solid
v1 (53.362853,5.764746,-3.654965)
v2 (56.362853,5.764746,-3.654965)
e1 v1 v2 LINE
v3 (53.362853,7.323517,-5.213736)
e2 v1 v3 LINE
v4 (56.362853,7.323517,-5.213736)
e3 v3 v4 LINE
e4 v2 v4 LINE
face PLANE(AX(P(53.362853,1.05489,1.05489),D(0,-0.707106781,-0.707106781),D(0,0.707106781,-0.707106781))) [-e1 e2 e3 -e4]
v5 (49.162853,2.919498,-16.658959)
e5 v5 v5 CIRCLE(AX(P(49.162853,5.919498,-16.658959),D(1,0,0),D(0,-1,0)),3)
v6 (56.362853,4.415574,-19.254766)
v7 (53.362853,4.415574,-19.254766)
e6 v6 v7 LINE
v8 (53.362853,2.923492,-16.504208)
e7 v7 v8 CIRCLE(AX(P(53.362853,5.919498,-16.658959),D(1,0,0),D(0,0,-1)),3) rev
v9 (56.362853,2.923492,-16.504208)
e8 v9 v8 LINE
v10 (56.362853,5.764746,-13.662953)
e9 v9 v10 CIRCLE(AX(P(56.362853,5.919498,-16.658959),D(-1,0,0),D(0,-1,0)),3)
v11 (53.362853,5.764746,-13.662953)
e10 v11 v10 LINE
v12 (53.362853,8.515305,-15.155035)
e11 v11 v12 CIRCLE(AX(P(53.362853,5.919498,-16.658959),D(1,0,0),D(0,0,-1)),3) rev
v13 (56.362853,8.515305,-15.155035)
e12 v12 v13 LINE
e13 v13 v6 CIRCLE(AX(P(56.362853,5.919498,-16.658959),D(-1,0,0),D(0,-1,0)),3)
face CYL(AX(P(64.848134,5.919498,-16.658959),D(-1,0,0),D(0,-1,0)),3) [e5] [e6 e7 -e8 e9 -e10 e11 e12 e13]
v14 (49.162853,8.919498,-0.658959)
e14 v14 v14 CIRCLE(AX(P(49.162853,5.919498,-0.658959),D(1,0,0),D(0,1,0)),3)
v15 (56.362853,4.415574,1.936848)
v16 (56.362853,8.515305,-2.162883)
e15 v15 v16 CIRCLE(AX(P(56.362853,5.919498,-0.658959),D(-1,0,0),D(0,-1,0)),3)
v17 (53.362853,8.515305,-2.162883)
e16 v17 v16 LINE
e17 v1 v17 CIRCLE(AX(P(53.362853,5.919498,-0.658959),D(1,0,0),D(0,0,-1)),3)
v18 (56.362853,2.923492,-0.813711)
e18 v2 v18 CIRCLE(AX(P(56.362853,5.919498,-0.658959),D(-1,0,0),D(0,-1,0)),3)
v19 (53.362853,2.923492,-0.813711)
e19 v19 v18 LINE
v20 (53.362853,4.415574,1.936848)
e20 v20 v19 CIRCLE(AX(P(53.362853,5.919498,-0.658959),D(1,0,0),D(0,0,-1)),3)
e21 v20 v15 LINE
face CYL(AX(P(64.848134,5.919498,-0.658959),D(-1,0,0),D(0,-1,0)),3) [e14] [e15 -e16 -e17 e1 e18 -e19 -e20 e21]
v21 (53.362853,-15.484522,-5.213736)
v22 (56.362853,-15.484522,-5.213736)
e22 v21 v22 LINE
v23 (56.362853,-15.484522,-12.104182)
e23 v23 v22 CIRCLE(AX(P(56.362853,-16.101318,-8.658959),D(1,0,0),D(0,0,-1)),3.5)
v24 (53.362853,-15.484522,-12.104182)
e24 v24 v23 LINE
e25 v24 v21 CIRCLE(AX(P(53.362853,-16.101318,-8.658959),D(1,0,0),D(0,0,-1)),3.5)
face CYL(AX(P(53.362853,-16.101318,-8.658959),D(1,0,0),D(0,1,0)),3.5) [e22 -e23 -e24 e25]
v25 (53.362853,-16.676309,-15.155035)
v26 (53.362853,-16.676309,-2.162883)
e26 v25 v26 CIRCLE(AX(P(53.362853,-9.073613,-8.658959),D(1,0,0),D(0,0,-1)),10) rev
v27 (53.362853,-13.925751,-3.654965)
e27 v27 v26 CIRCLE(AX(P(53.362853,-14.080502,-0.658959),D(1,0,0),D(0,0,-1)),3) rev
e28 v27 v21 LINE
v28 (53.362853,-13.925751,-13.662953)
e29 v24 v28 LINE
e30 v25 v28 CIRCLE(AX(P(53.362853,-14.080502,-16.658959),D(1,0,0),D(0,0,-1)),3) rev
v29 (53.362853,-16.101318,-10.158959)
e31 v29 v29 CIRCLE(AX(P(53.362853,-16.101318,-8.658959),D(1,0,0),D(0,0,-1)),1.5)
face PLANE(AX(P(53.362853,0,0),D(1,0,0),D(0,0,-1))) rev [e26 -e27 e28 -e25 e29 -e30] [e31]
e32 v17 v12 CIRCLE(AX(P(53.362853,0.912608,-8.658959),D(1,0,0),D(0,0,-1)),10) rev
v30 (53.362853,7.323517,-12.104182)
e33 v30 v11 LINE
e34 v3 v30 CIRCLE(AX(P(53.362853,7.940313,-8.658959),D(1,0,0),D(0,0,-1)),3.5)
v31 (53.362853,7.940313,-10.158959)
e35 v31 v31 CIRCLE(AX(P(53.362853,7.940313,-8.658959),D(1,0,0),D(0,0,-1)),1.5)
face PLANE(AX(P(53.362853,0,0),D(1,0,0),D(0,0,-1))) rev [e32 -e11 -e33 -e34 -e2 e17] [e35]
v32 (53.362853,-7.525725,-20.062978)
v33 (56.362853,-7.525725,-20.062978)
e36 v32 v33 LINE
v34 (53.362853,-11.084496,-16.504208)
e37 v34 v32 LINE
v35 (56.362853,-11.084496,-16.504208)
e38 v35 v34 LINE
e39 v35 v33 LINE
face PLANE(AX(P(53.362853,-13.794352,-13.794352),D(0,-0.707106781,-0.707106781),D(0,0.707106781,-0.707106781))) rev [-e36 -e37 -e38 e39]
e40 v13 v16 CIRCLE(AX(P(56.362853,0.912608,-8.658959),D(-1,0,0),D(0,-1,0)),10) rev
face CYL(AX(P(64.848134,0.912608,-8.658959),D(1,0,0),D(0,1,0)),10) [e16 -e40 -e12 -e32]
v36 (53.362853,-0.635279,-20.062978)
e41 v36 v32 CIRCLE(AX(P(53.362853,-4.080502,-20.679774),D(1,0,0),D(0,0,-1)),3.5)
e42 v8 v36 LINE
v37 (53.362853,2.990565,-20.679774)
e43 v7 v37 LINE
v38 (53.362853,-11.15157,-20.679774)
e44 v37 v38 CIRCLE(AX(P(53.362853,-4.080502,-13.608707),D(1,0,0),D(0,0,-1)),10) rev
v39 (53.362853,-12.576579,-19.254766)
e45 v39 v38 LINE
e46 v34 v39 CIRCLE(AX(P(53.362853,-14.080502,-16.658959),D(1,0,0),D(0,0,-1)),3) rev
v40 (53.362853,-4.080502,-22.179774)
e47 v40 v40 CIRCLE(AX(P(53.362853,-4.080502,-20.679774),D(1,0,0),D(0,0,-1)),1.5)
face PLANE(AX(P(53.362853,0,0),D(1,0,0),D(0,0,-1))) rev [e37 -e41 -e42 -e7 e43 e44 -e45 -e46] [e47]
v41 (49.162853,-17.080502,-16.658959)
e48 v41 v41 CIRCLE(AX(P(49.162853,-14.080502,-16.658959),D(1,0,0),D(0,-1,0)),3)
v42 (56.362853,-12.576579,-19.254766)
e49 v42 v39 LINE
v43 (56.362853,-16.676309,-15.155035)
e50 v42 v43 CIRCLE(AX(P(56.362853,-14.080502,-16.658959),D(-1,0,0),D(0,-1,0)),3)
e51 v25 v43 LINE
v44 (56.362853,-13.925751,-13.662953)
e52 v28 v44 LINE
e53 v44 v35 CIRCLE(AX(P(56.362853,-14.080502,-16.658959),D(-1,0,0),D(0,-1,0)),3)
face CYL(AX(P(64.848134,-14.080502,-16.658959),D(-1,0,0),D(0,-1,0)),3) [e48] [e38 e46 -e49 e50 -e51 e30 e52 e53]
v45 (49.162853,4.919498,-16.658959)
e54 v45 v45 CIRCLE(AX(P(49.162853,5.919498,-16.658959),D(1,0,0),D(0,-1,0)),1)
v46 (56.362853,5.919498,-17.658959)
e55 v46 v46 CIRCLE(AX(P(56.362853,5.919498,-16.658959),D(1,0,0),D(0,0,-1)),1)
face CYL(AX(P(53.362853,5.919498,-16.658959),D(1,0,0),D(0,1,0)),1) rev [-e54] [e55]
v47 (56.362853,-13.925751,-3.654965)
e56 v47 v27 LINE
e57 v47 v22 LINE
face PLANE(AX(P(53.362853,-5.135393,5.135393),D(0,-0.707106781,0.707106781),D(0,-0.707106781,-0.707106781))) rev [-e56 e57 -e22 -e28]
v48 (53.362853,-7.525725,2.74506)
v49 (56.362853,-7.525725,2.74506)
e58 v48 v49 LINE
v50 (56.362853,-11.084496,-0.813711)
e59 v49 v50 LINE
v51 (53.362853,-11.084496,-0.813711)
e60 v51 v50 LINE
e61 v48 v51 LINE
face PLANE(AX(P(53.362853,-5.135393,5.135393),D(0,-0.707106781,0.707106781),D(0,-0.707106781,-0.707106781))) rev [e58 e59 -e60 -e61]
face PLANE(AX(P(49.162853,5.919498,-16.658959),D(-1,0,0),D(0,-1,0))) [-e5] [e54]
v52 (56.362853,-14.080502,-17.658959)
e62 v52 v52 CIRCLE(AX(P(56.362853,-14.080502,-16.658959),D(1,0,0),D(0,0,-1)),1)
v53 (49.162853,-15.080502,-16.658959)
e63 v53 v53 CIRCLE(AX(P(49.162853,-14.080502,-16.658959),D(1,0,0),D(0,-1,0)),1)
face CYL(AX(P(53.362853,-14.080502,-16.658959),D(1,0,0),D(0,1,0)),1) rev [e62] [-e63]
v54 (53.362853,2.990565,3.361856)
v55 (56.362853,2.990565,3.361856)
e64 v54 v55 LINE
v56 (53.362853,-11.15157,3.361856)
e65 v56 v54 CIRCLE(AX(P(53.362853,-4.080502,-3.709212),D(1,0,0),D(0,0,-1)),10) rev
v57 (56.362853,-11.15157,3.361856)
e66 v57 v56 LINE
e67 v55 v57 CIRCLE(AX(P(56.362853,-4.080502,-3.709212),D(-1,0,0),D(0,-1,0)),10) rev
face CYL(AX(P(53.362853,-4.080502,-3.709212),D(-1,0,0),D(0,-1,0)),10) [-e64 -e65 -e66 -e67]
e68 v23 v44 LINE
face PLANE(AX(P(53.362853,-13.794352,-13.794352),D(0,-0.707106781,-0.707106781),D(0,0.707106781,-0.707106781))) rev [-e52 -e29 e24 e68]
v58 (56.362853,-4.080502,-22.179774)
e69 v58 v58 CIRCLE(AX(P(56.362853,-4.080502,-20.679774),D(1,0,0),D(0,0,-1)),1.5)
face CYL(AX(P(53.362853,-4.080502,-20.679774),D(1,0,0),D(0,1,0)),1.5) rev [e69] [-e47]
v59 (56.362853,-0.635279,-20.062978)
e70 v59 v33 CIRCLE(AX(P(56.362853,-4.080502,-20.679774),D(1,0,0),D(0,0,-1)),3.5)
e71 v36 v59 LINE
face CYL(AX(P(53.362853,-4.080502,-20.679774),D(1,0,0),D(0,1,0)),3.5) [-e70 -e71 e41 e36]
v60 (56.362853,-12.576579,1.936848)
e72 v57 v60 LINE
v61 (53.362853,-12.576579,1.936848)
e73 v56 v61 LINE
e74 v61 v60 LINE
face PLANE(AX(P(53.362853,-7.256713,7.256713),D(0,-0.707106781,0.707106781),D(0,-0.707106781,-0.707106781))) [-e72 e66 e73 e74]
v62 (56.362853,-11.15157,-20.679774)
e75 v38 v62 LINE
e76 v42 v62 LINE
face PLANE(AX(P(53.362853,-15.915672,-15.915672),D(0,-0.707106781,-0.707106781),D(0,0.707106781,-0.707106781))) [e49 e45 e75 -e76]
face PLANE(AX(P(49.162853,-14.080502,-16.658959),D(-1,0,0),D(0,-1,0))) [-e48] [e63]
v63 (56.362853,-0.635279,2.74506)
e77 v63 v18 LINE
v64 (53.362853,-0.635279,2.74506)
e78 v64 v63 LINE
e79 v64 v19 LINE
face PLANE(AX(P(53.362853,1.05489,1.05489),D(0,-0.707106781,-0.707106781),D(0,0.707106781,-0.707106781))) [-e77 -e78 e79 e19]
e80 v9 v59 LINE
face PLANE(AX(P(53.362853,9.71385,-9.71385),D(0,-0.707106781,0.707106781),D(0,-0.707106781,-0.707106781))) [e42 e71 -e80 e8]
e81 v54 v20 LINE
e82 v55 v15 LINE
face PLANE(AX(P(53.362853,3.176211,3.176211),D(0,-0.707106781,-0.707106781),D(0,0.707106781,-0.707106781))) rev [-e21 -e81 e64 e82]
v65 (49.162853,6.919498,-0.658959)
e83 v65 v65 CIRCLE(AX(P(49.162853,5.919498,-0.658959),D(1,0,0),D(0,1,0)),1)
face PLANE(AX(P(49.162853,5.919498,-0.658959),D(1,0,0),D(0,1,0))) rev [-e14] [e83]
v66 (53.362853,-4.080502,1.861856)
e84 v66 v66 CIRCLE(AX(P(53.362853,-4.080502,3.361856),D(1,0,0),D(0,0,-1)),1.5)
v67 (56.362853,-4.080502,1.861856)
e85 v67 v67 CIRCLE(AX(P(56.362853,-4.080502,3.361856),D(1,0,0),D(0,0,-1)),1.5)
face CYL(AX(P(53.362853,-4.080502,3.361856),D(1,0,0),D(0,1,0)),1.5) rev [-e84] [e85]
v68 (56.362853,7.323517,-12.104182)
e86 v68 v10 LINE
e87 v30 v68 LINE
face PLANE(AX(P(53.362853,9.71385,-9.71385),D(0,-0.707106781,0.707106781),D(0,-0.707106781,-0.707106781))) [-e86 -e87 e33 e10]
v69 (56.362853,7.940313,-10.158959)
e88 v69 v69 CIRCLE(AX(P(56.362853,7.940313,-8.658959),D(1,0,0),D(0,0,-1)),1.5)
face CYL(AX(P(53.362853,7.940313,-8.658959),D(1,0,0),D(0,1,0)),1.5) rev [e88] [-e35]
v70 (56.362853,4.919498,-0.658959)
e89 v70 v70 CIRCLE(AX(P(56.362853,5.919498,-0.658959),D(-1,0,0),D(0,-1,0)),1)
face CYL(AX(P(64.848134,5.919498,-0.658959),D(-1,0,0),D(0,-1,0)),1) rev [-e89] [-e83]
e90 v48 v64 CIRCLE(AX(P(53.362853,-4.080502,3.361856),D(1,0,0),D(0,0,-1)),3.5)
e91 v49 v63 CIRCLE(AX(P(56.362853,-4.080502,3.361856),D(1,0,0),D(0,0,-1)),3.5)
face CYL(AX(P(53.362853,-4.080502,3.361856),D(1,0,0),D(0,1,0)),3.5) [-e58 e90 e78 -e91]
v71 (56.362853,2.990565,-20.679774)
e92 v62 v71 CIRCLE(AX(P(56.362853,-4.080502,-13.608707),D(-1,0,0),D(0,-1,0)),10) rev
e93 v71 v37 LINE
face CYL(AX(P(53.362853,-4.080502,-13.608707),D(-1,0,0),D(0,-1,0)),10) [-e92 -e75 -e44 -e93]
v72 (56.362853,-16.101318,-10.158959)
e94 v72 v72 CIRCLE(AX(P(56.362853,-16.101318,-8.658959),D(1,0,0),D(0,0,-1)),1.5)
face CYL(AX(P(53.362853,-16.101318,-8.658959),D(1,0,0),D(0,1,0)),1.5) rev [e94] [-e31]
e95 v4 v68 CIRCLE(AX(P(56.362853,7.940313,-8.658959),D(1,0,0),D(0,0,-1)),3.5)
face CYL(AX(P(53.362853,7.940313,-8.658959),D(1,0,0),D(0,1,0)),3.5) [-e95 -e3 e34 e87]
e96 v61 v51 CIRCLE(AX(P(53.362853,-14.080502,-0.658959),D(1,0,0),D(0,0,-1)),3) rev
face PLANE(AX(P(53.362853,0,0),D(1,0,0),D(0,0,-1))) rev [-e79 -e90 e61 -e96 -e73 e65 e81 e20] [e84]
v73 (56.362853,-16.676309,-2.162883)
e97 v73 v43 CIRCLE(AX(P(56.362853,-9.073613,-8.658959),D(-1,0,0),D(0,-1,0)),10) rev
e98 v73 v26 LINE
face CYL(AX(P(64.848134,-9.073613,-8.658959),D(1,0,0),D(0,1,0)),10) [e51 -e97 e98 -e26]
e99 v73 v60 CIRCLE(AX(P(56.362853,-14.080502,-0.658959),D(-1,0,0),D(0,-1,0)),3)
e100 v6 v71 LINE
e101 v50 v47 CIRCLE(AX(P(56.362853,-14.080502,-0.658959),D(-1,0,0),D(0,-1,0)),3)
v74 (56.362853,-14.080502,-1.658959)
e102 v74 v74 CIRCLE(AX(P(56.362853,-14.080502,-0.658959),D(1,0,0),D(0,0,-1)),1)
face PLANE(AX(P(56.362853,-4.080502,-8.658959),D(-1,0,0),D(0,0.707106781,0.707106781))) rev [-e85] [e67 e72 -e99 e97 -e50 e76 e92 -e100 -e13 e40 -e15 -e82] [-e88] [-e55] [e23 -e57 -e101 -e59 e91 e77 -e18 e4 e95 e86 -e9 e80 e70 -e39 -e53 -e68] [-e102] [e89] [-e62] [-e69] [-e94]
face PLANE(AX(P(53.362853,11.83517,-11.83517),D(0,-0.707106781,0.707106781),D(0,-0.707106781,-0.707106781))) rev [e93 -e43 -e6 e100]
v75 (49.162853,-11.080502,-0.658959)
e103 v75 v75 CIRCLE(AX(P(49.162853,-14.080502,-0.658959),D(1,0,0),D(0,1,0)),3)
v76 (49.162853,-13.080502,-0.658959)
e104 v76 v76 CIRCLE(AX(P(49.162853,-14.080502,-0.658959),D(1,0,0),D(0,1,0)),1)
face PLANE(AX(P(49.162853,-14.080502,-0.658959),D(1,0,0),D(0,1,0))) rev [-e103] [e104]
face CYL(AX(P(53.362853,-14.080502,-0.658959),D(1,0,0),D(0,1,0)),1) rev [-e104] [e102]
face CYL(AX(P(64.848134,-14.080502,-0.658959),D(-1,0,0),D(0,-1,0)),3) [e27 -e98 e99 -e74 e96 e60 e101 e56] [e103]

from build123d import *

# Parameters (mm, degrees)
SKETCH1_R             = 3
SKETCH1_R_2           = 1
BOSS_EXTRUDE1_DEPTH   = 7.2
BOSS_EXTRUDE1_2_DEPTH = 7.2
BOSS_EXTRUDE1_3_DEPTH = 7.2
BOSS_EXTRUDE1_4_DEPTH = 7.2
BOSS_EXTRUDE2_START   = -3
SKETCH2_R             = 1.5
BOSS_EXTRUDE2_DEPTH   = 3
FILLET1_R             = 10


with BuildPart() as part:
    # Sketch1 → Boss-Extrude1 (new body)
    with BuildSketch(Plane(origin=(49.162852783, 0, 0), x_dir=(0, 0, -1), z_dir=(1, 0, 0))):
        with Locations(Location((0.658959109, 5.919497669, 0), (0, 0, 270))):
            Circle(SKETCH1_R)
        with Locations(Location((0.658959109, 5.919497669, 0), (0, 0, 270))):
            Circle(SKETCH1_R_2, mode=Mode.SUBTRACT)
    extrude(amount=BOSS_EXTRUDE1_DEPTH)



with BuildPart() as body_2:
    # Sketch1 → Boss-Extrude1 2 (new body)
    with BuildSketch(Plane(origin=(49.162852783, 0, 0), x_dir=(0, 0, -1), z_dir=(1, 0, 0))):
        with Locations(Location((0.658959109, -14.080502331, 0), (0, 0, 270))):
            Circle(SKETCH1_R)
        with Locations(Location((0.658959109, -14.080502331, 0), (0, 0, 270))):
            Circle(SKETCH1_R_2, mode=Mode.SUBTRACT)
    extrude(amount=BOSS_EXTRUDE1_2_DEPTH)


with BuildPart() as body_3:
    # Sketch1 → Boss-Extrude1 3 (new body)
    with BuildSketch(Plane(origin=(49.162852783, 0, 0), x_dir=(0, 0, -1), z_dir=(1, 0, 0))):
        with Locations(Location((16.658959109, -14.080502331, 0), (0, 0, 270))):
            Circle(SKETCH1_R)
        with Locations(Location((16.658959109, -14.080502331, 0), (0, 0, 270))):
            Circle(SKETCH1_R_2, mode=Mode.SUBTRACT)
    extrude(amount=BOSS_EXTRUDE1_3_DEPTH)


with BuildPart() as body_4:
    # Sketch1 → Boss-Extrude1 4 (new body)
    with BuildSketch(Plane(origin=(49.162852783, 0, 0), x_dir=(0, 0, -1), z_dir=(1, 0, 0))):
        with Locations(Location((16.658959109, 5.919497669, 0), (0, 0, 270))):
            Circle(SKETCH1_R)
        with Locations(Location((16.658959109, 5.919497669, 0), (0, 0, 270))):
            Circle(SKETCH1_R_2, mode=Mode.SUBTRACT)
    extrude(amount=BOSS_EXTRUDE1_4_DEPTH)


with BuildPart() as part_1:
    add(part.part)

    add(body_2.part)  # Boss-Extrude2 merges body 2

    add(body_3.part)  # Boss-Extrude2 merges body 3

    add(body_4.part)  # Boss-Extrude2 merges body 4
    # Sketch2 → Boss-Extrude2 (add)
    with BuildSketch(Plane(origin=(56.362852783, 0, 0), x_dir=(0, 0, -1), z_dir=(1, 0, 0)).offset(BOSS_EXTRUDE2_START)):
        with BuildLine():
            Line((-0.336368494, 6.016053158), (-10.432923983, -4.080502331))
            Line((-10.432923983, -4.080502331), (-0.336368494, -14.17705782))
            ThreePointArc((-0.336368494, -14.17705782), (1.366065891, -13.373395549), (0.562403621, -15.075829934))
            Line((0.562403621, -15.075829934), (8.658959109, -23.172385423))
            Line((8.658959109, -23.172385423), (16.755514598, -15.075829934))
            ThreePointArc((16.755514598, -15.075829934), (15.951852328, -13.373395549), (17.654286713, -14.17705782))
            Line((17.654286713, -14.17705782), (27.750842202, -4.080502331))
            Line((27.750842202, -4.080502331), (17.654286713, 6.016053158))
            ThreePointArc((17.654286713, 6.016053158), (15.951852328, 5.212390888), (16.755514598, 6.914825272))
            Line((16.755514598, 6.914825272), (8.658959109, 15.011380761))
            Line((8.658959109, 15.011380761), (0.562403621, 6.914825272))
            ThreePointArc((0.562403621, 6.914825272), (1.366065891, 5.212390888), (-0.336368494, 6.016053158))
        make_face()
        with Locations((-3.361856171, -4.080502331)):
            Circle(SKETCH2_R, mode=Mode.SUBTRACT)
        with BuildLine():
            ThreePointArc((-2.745060132, -7.525725494), (0.138143829, -4.080502331), (-2.745060132, -0.635279167))
            Line((-2.745060132, -0.635279167), (5.213735946, 7.323516911))
            ThreePointArc((5.213735946, 7.323516911), (8.658959109, 4.440312949), (12.104182273, 7.323516911))
            Line((12.104182273, 7.323516911), (20.062978351, -0.635279167))
            ThreePointArc((20.062978351, -0.635279167), (17.17977439, -4.080502331), (20.062978351, -7.525725494))
            Line((20.062978351, -7.525725494), (12.104182273, -15.484521572))
            ThreePointArc((12.104182273, -15.484521572), (8.658959109, -12.601317611), (5.213735946, -15.484521572))
            Line((5.213735946, -15.484521572), (-2.745060132, -7.525725494))
        make_face(mode=Mode.SUBTRACT)
        with Locations((8.658959109, -16.101317611)):
            Circle(SKETCH2_R, mode=Mode.SUBTRACT)
        with Locations((20.67977439, -4.080502331)):
            Circle(SKETCH2_R, mode=Mode.SUBTRACT)
        with Locations((8.658959109, 7.940312949)):
            Circle(SKETCH2_R, mode=Mode.SUBTRACT)
    extrude(amount=BOSS_EXTRUDE2_DEPTH)

    # Fillet1
    # the kernel refuses this fillet: 10 mm, written as the material it takes off along each edge
    with BuildSketch(Plane(origin=(30.395755029, 15.011380761, -8.658959109), x_dir=(0, -0.7071067811865511, -0.7071067811865438), z_dir=(1, 0, 0)), Plane(origin=(30.395755029, -23.172385423, -8.658959109), x_dir=(0, 0.7071067811865509, 0.707106781186544), z_dir=(1, 0, 0))) as fillet1_piece_1:
        with BuildLine():
            CenterArc((9.969337782, -9.969337782), FILLET1_R, 94.487975167, 81.024049665)
            Line((0, -9.186839102), (0, 0))
            Line((0, 0), (9.186839102, 0))
        make_face()
    extrude(amount=48.934195508, mode=Mode.SUBTRACT)
    with BuildSketch(Plane(origin=(28.362852783, -4.080502331, -27.750842202), x_dir=(-4.937700262164531e-15, -0.7071067811865436, 0.7071067811865513), z_dir=(1, 0, 0))) as fillet1_piece_2:
        with BuildLine():
            CenterArc((FILLET1_R, -FILLET1_R), FILLET1_R, 90, 90)
            Line((0, -FILLET1_R), (0, 0))
            Line((0, 0), (FILLET1_R, 0))
        make_face()
    extrude(amount=53, mode=Mode.SUBTRACT)
    with BuildSketch(Plane(origin=(28.362852783, -4.080502331, 10.432923983), x_dir=(0, -0.7071067811865515, -0.7071067811865436), z_dir=(1, 0, 0))) as fillet1_piece_3:
        with BuildLine():
            CenterArc((FILLET1_R, FILLET1_R), FILLET1_R, 180, 90)
            Line((0, FILLET1_R), (0, 0))
            Line((0, 0), (FILLET1_R, 0))
        make_face()
    extrude(amount=53, mode=Mode.SUBTRACT)


solid = part_1.part
